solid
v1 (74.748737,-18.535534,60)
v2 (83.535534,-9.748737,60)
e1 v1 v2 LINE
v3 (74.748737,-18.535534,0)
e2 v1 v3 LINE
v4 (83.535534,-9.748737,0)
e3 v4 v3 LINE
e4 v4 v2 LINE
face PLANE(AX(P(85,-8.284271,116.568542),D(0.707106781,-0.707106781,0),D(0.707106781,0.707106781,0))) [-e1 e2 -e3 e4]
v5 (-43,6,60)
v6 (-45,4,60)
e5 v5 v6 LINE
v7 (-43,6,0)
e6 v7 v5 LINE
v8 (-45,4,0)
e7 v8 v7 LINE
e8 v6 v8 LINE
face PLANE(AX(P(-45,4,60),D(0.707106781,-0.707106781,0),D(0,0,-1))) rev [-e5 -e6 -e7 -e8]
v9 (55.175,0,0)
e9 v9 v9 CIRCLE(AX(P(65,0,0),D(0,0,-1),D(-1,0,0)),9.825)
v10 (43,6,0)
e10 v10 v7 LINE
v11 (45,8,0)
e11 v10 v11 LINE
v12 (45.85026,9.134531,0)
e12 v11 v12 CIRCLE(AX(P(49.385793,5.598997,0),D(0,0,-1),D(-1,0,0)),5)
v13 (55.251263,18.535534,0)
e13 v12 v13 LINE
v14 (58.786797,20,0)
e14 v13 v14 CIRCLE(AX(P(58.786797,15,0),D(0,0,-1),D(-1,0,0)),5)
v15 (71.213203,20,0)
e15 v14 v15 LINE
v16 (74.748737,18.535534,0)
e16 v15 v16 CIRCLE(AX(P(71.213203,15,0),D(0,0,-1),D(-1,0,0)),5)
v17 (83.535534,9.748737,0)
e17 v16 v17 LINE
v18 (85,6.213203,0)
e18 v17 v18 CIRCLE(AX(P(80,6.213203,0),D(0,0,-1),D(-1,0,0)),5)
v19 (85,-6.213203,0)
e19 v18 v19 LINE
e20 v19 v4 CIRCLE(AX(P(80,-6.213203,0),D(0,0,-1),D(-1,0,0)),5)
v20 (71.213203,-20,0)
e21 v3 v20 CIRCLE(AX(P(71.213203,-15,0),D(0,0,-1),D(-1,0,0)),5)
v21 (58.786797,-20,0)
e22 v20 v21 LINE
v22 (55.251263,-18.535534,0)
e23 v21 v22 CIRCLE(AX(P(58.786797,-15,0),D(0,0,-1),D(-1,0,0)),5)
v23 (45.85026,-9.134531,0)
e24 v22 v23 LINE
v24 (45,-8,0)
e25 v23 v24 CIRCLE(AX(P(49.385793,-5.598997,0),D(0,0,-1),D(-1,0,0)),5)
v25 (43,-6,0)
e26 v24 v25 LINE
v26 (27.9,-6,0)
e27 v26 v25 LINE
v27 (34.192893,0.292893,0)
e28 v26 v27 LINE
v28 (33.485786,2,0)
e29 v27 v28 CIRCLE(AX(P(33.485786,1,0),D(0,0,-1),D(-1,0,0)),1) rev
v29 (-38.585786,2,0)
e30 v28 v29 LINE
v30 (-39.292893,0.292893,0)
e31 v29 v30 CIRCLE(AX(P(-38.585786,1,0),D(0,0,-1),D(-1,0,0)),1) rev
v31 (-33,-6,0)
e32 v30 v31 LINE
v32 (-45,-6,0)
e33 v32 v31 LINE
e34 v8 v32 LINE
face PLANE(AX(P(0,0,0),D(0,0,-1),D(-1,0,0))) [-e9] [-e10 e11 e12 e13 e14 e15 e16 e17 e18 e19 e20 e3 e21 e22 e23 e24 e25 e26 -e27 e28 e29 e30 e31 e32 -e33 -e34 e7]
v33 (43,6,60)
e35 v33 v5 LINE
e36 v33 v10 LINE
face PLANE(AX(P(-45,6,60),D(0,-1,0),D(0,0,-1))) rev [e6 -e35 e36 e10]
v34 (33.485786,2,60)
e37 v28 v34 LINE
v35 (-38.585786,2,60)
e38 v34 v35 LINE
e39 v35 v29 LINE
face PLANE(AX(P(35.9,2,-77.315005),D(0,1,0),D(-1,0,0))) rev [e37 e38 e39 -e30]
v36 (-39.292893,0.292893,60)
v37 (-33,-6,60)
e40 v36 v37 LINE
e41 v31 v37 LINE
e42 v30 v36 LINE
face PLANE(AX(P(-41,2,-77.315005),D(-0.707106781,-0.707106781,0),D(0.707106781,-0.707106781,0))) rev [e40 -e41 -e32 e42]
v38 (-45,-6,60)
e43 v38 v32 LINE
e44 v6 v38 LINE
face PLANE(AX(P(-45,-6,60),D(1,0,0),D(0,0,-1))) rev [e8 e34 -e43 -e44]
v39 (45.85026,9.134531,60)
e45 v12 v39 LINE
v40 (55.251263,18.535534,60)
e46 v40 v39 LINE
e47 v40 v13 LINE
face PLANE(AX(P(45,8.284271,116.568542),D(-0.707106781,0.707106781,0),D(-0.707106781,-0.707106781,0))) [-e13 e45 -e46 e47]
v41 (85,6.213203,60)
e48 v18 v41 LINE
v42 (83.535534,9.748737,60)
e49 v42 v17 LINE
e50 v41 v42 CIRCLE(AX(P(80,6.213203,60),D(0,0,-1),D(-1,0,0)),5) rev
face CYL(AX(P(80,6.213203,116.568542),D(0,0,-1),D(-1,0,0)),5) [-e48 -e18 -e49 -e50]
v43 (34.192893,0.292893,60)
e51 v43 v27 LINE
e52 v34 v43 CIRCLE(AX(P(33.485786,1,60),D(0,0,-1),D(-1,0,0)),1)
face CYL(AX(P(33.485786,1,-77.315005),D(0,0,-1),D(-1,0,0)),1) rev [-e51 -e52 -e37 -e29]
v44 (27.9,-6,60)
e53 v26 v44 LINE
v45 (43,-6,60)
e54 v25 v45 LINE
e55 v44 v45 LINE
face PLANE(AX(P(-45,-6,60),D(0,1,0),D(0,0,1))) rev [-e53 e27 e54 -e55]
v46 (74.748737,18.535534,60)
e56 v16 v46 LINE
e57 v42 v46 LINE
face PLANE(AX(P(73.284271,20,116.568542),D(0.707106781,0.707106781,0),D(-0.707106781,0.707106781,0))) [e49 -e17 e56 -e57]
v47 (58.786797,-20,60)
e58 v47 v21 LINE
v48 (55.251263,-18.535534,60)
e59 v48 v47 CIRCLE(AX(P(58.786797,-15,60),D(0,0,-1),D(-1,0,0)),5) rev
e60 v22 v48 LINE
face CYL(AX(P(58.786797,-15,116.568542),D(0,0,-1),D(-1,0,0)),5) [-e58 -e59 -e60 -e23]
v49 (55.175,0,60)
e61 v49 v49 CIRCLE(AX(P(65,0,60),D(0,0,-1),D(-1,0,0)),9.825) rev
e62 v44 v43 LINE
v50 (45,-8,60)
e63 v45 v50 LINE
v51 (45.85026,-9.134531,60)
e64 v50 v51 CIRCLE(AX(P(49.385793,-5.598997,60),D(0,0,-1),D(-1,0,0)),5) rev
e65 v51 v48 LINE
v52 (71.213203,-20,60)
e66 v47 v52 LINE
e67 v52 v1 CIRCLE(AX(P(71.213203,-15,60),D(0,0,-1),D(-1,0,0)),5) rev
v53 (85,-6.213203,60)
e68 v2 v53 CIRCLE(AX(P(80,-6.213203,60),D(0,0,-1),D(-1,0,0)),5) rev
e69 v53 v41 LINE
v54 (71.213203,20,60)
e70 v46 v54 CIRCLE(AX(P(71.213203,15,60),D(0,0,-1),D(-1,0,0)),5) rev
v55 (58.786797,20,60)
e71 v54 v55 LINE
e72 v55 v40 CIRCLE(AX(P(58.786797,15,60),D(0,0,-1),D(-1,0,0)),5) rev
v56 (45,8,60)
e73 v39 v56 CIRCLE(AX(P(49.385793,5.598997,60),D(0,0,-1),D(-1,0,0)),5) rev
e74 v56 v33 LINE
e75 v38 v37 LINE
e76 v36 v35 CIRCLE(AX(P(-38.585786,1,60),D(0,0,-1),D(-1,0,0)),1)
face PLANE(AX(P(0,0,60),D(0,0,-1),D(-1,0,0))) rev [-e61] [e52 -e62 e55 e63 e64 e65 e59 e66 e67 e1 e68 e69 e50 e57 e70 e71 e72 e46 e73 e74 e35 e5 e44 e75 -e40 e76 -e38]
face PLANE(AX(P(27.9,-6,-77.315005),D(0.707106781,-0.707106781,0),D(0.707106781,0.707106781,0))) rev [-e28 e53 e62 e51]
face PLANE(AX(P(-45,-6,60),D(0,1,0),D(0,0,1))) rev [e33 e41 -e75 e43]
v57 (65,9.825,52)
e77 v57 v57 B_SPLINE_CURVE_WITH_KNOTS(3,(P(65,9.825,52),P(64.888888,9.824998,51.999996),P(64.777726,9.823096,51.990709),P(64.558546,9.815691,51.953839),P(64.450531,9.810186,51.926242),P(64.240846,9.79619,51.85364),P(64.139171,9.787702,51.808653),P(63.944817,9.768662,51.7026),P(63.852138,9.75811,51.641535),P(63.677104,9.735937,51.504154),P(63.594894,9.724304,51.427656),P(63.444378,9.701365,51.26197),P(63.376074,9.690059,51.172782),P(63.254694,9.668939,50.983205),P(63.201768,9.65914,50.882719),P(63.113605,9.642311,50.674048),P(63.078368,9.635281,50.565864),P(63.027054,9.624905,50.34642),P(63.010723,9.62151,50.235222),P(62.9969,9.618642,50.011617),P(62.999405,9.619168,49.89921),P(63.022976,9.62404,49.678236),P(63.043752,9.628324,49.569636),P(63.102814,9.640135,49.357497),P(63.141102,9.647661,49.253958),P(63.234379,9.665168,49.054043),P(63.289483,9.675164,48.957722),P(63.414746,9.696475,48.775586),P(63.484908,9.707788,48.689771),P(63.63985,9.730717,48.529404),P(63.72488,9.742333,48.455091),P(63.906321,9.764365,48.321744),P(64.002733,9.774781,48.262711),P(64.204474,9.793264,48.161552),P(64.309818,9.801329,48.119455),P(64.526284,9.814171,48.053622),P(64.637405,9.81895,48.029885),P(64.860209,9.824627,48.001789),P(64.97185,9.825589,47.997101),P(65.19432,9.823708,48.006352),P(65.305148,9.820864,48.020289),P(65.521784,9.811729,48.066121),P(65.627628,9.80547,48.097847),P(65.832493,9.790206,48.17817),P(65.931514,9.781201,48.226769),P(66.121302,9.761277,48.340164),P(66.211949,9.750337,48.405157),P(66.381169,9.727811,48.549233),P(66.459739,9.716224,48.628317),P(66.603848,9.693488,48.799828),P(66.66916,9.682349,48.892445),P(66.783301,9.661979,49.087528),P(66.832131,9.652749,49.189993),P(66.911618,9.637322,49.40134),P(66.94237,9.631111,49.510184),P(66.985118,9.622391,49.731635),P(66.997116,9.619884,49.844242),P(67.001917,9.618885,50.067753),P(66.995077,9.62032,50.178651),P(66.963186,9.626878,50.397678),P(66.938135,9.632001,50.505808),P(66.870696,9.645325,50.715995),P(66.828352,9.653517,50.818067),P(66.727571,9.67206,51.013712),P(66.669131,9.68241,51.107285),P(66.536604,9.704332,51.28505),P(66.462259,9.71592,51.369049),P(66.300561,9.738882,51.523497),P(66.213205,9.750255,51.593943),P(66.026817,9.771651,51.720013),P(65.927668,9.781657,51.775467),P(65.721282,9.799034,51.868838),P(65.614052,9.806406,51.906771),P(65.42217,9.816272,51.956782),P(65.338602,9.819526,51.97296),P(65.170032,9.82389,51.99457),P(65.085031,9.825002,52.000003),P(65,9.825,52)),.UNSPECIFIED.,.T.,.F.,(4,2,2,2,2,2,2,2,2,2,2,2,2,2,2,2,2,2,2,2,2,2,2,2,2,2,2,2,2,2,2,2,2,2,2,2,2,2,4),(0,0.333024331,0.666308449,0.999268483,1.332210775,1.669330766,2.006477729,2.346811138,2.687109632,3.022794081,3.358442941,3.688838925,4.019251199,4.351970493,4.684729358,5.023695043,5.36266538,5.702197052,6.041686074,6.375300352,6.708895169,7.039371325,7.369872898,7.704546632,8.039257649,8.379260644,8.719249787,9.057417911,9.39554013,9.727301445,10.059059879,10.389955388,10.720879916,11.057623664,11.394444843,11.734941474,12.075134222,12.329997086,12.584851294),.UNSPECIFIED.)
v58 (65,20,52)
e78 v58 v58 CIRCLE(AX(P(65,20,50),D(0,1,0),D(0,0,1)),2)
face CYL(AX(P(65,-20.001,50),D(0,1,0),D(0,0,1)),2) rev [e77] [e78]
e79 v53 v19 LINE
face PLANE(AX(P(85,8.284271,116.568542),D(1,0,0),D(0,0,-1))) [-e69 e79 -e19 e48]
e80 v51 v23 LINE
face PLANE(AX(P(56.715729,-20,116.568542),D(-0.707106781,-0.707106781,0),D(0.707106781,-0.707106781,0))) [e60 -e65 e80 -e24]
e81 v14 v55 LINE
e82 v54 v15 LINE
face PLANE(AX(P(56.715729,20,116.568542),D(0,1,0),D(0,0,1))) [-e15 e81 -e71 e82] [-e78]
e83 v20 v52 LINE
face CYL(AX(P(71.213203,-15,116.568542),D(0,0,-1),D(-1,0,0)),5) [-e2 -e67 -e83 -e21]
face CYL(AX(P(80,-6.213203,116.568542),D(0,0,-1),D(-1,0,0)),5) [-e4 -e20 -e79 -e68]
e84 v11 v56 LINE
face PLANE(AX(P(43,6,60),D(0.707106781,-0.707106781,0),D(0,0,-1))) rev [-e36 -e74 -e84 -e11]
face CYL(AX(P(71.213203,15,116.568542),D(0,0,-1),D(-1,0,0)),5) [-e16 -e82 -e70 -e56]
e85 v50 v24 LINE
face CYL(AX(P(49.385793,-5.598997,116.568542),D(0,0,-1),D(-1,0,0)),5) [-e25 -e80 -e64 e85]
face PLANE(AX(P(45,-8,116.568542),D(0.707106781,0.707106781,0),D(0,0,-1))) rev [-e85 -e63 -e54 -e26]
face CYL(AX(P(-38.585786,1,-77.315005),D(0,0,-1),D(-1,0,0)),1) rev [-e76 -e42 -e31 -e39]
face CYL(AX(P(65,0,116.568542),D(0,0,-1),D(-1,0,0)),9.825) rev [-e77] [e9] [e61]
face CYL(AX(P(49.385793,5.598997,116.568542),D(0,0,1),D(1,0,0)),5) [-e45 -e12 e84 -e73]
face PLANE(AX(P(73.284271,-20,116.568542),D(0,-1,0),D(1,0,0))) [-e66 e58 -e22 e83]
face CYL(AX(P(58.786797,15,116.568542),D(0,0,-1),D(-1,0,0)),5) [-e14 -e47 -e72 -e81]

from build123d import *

# Parameters (mm, degrees)
SKETCH_1_W               = 90
SKETCH_1_H               = 12
EXTRUDE_1_DEPTH          = 60
CUT_EXTRUDE_1_DEPTH      = 60
SKETCH_3_R               = 9.825
EXTRUDE_2_DEPTH          = 60
CHAMFER_1_SIZE           = 2
FILLET_1_R               = 1
CHAMFER_3_SIZE           = 2
FILLET_2_R               = 5
CUT_EXTRUDE_2_REACH      = 113.467
CUT_EXTRUDE_2_END_RADIUS = 9.825
SKETCH_4_R               = 2


with BuildPart() as part:
    # Эскиз1 → Бобышка-Вытянуть1 (new body)
    with BuildSketch(Plane.XY):
        Rectangle(SKETCH_1_W, SKETCH_1_H)
    extrude(amount=EXTRUDE_1_DEPTH)

    # Эскиз2 → Вырез-Вытянуть1 (cut)
    with BuildSketch(Plane.XY.offset(60)):
        Polygon((-41, 2), (-33, -6), (27.9, -6), (35.9, 2), align=None)
    extrude(amount=-CUT_EXTRUDE_1_DEPTH, mode=Mode.SUBTRACT)

    # Эскиз3 → Бобышка-Вытянуть2 (add)
    with BuildSketch(Plane(origin=(0, 0, 0), x_dir=(-1, 0, 0), z_dir=(0, 0, -1))):
        Polygon((-73.284271247, -20), (-56.715728753, -20), (-45, -8.284271247), (-45, 8.284271247), (-56.715728753, 20), (-73.284271247, 20), (-85, 8.284271247), (-85, -8.284271247), align=None)
        with Locations((-65, 0)):
            Circle(SKETCH_3_R, mode=Mode.SUBTRACT)
    extrude(amount=-EXTRUDE_2_DEPTH)

    # Фаска1
    chamfer_1_edges = [part.edges().sort_by_distance(p)[0] for p in [
        (-45, 6, 30),
    ]]
    chamfer(chamfer_1_edges, length=CHAMFER_1_SIZE)

    # Скругление1
    fillet_1_edges = [part.edges().sort_by_distance(p)[0] for p in [
        (35.9, 2, 30),
        (-41, 2, 30),
    ]]
    fillet(fillet_1_edges, radius=FILLET_1_R)

    # Фаска3
    chamfer_3_edges = [part.edges().sort_by_distance(p)[0] for p in [
        (45, -6, 30),
        (45, 6, 30),
    ]]
    chamfer(chamfer_3_edges, length=CHAMFER_3_SIZE)

    # Скругление2
    # the kernel refuses this fillet: 5 mm, written as the material it takes off along each edge
    with BuildSketch(Plane(origin=(45, -8.284271247, -3.006121321), x_dir=(0.7071067811865452, -0.7071067811865497, 0), z_dir=(0, 0, 1))) as fillet_2_piece_1:
        with BuildLine():
            CenterArc((1.202448528, 5), FILLET_2_R, 253.698506294, 16.301493706)
            Line((-0.201010127, 0.201010127), (-0.2290793, 0.105030329))
            ThreePointArc((-0.2290793, 0.105030329), (-0.171215742, 0.029794385), (-0.070710678, -0.070710678))
            Line((-0.070710678, -0.070710678), (0, -0.1))
            Line((0, -0.1), (1.202448528, -0.1))
            Line((1.202448528, -0.1), (1.202448528, 0))
        make_face()
    extrude(amount=66.012242642, mode=Mode.SUBTRACT)
    with BuildSketch(Plane(origin=(56.715728753, -20, -5.17766953), x_dir=(1, 0, 0), z_dir=(0, 0, 1)), Plane(origin=(73.284271247, -20, -5.17766953), x_dir=(0.7071067811865485, 0.7071067811865467, 0), z_dir=(0, 0, 1)), Plane(origin=(85, -8.284271247, -5.17766953), x_dir=(0, 1, 0), z_dir=(0, 0, 1)), Plane(origin=(85, 8.284271247, -5.17766953), x_dir=(-0.7071067811865461, 0.7071067811865487, 0), z_dir=(0, 0, 1)), Plane(origin=(73.284271247, 20, -5.17766953), x_dir=(-1, 0, 0), z_dir=(0, 0, 1)), Plane(origin=(56.715728753, 20, -5.17766953), x_dir=(-0.7071067811865467, -0.7071067811865483, 0), z_dir=(0, 0, 1))) as fillet_2_piece_2:
        with BuildLine():
            CenterArc((FILLET_2_R * 0.414213562373, FILLET_2_R), FILLET_2_R, 225, 45)
            Line((-FILLET_2_R * 0.292893218813, FILLET_2_R * 0.292893218813), (-FILLET_2_R * 0.307035354437, FILLET_2_R * 0.27875108319))
            Line((-FILLET_2_R * 0.307035354437, FILLET_2_R * 0.27875108319), (-FILLET_2_R * 0.00828427124746, -FILLET_2_R * 0.02))
            Line((-FILLET_2_R * 0.00828427124746, -FILLET_2_R * 0.02), (FILLET_2_R * 0.414213562373, -FILLET_2_R * 0.02))
            Line((FILLET_2_R * 0.414213562373, -FILLET_2_R * 0.02), (FILLET_2_R * 0.414213562373, 0))
        make_face()
    extrude(amount=70.355339059, mode=Mode.SUBTRACT)
    with BuildSketch(Plane(origin=(45, 8.284271247, -3.006121321), x_dir=(0, -1, 0), z_dir=(0, 0, 1))) as fillet_2_piece_3:
        with BuildLine():
            CenterArc((2.685274397, 4.385793414), FILLET_2_R, 225, 16.301493706)
            Line((-0.850259508, 0.850259508), (-0.920970187, 0.77954883))
            Line((-0.920970187, 0.77954883), (-0.070710678, -0.070710678))
            Line((-0.070710678, -0.070710678), (0, -0.1))
            ThreePointArc((0, -0.1), (0.142135624, -0.1), (0.236251184, -0.087715868))
            Line((0.236251184, -0.087715868), (0.284271247, 0))
        make_face()
    extrude(amount=66.012242642, mode=Mode.SUBTRACT)

    # Вырез-Вытянуть2: up to this cylinder (the profile starts outside it)
    cut_extrude_2_end = Plane(origin=(65, 0, 50), z_dir=(0, 0, -1)) * Cylinder(CUT_EXTRUDE_2_END_RADIUS, 247.584, mode=Mode.PRIVATE)
    # Эскиз4 → Вырез-Вытянуть2 (cut, up to the surface)
    with BuildSketch(Plane(origin=(0, 20, 0), x_dir=(1, 0, 0), z_dir=(0, 1, 0)), mode=Mode.PRIVATE) as cut_extrude_2_sk1:
        with Locations(Location((65, -50, 0), (0, 0, 270))):
            Circle(SKETCH_4_R)
    cut_extrude_2_tool1 = extrude(cut_extrude_2_sk1.sketch, amount=-CUT_EXTRUDE_2_REACH, mode=Mode.PRIVATE) - cut_extrude_2_end
    add(cut_extrude_2_tool1.solids().sort_by_distance((65, 20, 50))[0], mode=Mode.SUBTRACT)


solid = part.part
